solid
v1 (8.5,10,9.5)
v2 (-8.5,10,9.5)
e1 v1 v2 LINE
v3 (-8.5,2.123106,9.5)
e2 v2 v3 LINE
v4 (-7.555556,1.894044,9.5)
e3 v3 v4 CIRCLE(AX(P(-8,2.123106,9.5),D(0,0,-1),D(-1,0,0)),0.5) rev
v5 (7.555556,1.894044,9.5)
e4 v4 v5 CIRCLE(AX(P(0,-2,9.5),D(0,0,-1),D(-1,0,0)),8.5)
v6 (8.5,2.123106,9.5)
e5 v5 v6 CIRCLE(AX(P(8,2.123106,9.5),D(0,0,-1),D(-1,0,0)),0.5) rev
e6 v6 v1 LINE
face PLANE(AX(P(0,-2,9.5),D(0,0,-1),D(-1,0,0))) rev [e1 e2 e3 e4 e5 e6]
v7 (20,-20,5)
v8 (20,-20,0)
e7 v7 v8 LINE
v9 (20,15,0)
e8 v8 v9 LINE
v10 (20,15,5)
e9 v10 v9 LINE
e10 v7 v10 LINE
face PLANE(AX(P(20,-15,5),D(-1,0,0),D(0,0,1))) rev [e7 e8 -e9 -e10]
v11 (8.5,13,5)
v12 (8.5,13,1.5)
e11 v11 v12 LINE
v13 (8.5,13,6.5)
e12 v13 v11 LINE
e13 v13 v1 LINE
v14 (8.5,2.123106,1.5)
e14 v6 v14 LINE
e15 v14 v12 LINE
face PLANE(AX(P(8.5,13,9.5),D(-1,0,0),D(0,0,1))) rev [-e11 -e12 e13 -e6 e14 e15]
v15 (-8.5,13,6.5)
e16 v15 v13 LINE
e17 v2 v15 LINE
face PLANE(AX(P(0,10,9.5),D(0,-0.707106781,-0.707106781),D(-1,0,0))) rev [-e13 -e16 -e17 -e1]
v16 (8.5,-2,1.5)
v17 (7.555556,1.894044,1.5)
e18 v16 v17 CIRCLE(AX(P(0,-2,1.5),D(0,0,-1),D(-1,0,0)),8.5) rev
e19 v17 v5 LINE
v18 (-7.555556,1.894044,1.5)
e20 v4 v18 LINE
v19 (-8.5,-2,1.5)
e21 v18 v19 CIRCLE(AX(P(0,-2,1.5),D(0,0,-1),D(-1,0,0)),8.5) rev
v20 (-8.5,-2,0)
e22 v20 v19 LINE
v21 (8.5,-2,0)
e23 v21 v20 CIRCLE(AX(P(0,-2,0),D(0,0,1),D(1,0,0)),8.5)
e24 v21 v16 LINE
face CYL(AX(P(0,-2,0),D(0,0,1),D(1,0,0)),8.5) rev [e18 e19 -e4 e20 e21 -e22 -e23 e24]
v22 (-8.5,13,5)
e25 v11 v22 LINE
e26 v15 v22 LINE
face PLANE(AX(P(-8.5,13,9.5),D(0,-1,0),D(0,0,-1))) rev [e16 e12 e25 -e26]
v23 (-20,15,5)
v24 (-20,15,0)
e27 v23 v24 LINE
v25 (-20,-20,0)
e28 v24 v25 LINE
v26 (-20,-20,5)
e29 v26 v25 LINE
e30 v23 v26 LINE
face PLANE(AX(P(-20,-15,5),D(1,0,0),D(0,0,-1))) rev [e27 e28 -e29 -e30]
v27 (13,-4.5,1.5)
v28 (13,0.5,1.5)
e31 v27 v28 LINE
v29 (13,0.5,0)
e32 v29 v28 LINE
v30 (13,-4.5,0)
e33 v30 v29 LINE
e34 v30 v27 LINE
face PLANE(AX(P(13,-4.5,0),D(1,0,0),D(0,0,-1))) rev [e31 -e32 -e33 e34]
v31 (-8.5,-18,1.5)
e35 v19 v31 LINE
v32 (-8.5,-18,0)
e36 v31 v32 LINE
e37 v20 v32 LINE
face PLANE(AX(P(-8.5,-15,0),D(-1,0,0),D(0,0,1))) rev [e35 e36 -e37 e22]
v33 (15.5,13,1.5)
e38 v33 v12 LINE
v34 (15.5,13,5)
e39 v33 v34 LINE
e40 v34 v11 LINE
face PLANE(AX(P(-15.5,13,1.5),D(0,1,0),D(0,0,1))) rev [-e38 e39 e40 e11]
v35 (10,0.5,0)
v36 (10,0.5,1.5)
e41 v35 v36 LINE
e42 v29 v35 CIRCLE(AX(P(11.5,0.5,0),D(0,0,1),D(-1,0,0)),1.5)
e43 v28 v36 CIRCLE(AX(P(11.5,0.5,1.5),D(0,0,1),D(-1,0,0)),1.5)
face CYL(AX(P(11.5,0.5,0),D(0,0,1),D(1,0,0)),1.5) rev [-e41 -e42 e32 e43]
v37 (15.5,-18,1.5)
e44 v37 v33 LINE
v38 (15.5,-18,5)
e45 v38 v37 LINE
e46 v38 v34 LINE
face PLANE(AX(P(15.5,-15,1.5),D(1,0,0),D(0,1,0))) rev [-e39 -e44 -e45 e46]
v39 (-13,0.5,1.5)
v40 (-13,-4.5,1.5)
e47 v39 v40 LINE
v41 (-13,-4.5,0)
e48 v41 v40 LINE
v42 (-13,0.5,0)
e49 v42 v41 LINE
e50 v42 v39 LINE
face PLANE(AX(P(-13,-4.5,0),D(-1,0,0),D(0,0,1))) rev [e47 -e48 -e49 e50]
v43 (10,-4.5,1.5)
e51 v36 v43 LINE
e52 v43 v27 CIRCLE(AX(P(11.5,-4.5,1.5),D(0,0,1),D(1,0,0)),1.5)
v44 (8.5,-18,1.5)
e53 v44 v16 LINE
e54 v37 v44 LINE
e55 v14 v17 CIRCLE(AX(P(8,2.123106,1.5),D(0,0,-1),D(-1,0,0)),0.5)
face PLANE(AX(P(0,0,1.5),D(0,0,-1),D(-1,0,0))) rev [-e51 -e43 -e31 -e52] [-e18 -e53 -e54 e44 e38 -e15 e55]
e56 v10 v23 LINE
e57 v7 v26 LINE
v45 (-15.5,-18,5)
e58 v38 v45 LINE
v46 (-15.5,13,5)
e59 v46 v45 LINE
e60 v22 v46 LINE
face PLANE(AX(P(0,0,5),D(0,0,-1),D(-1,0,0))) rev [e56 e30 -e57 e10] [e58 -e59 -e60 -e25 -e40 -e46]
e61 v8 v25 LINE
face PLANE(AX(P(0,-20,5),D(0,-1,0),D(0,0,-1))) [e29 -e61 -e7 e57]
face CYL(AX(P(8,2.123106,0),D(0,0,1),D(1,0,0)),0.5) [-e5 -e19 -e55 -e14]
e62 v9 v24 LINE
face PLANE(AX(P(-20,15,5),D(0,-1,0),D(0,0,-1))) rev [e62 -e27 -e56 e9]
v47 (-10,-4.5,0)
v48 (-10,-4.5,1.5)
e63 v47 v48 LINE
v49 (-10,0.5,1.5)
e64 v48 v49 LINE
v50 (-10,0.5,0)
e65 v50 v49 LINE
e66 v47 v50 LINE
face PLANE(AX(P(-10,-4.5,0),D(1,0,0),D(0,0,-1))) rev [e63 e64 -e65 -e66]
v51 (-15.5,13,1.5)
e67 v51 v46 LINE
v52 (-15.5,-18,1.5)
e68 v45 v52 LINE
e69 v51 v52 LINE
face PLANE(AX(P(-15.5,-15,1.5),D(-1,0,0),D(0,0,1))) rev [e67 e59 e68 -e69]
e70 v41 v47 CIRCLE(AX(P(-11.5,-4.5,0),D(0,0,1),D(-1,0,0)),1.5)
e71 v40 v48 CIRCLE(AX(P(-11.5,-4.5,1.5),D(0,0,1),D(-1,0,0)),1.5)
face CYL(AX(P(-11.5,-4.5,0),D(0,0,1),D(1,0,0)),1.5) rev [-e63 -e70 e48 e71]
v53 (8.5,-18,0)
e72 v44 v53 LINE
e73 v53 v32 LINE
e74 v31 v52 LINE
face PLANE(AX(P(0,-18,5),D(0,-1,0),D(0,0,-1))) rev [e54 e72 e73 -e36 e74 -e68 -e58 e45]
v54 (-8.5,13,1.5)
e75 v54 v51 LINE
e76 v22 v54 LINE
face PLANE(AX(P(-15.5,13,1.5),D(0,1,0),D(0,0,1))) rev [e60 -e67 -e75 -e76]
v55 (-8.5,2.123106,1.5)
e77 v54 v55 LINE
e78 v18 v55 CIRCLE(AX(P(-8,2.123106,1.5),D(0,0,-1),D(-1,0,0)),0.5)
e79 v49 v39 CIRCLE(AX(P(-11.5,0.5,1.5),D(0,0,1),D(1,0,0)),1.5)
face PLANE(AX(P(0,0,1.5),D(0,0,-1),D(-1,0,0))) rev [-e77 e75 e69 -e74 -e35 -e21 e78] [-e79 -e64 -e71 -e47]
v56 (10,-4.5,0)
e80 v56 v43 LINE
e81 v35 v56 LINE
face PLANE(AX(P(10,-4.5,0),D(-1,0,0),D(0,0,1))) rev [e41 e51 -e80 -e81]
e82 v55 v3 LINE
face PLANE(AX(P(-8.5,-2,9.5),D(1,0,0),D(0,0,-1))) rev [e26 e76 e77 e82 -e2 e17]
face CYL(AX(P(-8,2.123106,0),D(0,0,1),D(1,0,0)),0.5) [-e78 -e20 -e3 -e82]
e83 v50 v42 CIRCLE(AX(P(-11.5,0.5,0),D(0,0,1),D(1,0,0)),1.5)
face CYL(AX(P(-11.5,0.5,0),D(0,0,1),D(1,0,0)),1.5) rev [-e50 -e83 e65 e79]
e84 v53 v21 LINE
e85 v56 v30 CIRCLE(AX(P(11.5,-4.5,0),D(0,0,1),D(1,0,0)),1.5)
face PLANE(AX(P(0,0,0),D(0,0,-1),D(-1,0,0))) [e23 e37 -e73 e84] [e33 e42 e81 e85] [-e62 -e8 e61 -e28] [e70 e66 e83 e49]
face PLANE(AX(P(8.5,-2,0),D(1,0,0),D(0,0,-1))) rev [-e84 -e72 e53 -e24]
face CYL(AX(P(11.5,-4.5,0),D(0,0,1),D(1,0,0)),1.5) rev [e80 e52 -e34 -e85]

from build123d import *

# Parameters (mm, degrees)
SKETCH_1_W          = 40
SKETCH_1_H          = 30
EXTRUDE_1_DEPTH     = 5
SKETCH_2_W          = 31
SKETCH_2_H          = 28
CUT_EXTRUDE_1_DEPTH = 3.5
CUT_EXTRUDE_2_DEPTH = 26.243811123
EXTRUDE_START       = 8
EXTRUDE_2_DEPTH     = 8
FILLET_START        = 1.5
FILLET_1_DEPTH      = 8.5
CHAMFER_1_SIZE      = 3
EXTRUDE_3_DEPTH     = 5
SKETCH_7_W          = 7
SKETCH_7_H          = 3
EXTRUDE_4_DEPTH     = 1.5


with BuildPart() as part:
    # ｽｹｯﾁ1 → ﾎﾞｽ - 押し出し1 (new body)
    with BuildSketch(Plane.XY):
        Rectangle(SKETCH_1_W, SKETCH_1_H)
    extrude(amount=EXTRUDE_1_DEPTH)

    # ｽｹｯﾁ2 → ｶｯﾄ - 押し出し1 (cut)
    with BuildSketch(Plane.XY.offset(5)):
        with Locations((0, -1)):
            Rectangle(SKETCH_2_W, SKETCH_2_H)
    extrude(amount=-CUT_EXTRUDE_1_DEPTH, mode=Mode.SUBTRACT)

    # ｽｹｯﾁ3 → ｶｯﾄ - 押し出し2 (cut, through all)
    with BuildSketch(Plane.XY.offset(1.5)):
        with BuildLine():
            Line((8.5, -2), (8.5, -15))
            Line((8.5, -15), (-8.5, -15))
            Line((-8.5, -15), (-8.5, -2))
            ThreePointArc((-8.5, -2), (0, 6.5), (8.5, -2))
        make_face()
        with BuildLine():
            Line((13, -4.5), (13, 0.5))
            ThreePointArc((13, 0.5), (11.5, 2), (10, 0.5))
            Line((10, 0.5), (10, -4.5))
            ThreePointArc((10, -4.5), (11.5, -6), (13, -4.5))
        make_face()
        with BuildLine():
            Line((-13, -4.5), (-13, 0.5))
            ThreePointArc((-13, 0.5), (-11.5, 2), (-10, 0.5))
            Line((-10, 0.5), (-10, -4.5))
            ThreePointArc((-10, -4.5), (-11.5, -6), (-13, -4.5))
        make_face()
    extrude(amount=-CUT_EXTRUDE_2_DEPTH, mode=Mode.SUBTRACT)

    # ｽｹｯﾁ4 → ﾎﾞｽ - 押し出し2 (add)
    with BuildSketch(Plane.XY.offset(1.5).offset(EXTRUDE_START)):
        with BuildLine():
            Line((-8.5, -2), (-8.5, 13))
            Line((-8.5, 13), (8.5, 13))
            Line((8.5, 13), (8.5, -2))
            ThreePointArc((8.5, -2), (0, 6.5), (-8.5, -2))
        make_face()
    extrude(amount=-EXTRUDE_2_DEPTH)

    # ﾌｨﾚｯﾄ1: read off the stored shape, not the designer's step
    # ﾌｨﾚｯﾄ1 outline → ﾌｨﾚｯﾄ1 (cut)
    with BuildSketch(Plane.XY.offset(FILLET_START)):
        with BuildLine():
            ThreePointArc((8.5, 2.123105626), (8.117851131, 1.637192968), (7.555555556, 1.894044202))
            ThreePointArc((7.555555556, 1.894044202), (8.260515184, 0.003469213), (8.5, -2))
            Line((8.5, -2), (8.5, 2.123105626))
        make_face()
        with BuildLine():
            ThreePointArc((-7.555555556, 1.894044202), (-8.117851131, 1.637192968), (-8.5, 2.123105626))
            Line((-8.5, 2.123105626), (-8.5, -2))
            ThreePointArc((-8.5, -2), (-8.260515184, 0.003469213), (-7.555555556, 1.894044202))
        make_face()
    extrude(amount=FILLET_1_DEPTH, mode=Mode.SUBTRACT)

    # 面取り1
    chamfer_1_edges = [part.edges().sort_by_distance(p)[0] for p in [
        (0, 13, 9.5),
    ]]
    chamfer(chamfer_1_edges, length=CHAMFER_1_SIZE)

    # ｽｹｯﾁ5 → ﾎﾞｽ - 押し出し3 (add)
    with BuildSketch(Plane(origin=(0, 0, 0), x_dir=(-1, 0, 0), z_dir=(0, 0, -1))):
        Polygon((-15.5, -15), (-20, -15), (-20, -20), (20, -20), (20, -15), (15.5, -15), (15.5, -18), (8.5, -18), (-8.5, -18), (-15.5, -18), align=None)
    extrude(amount=-EXTRUDE_3_DEPTH)

    # ｽｹｯﾁ7 → ﾎﾞｽ - 押し出し4 (add)
    with BuildSketch(Plane(origin=(0, 0, 0), x_dir=(-1, 0, 0), z_dir=(0, 0, -1))):
        with Locations((12, -16.5)):
            Rectangle(SKETCH_7_W, SKETCH_7_H)
        with Locations((-12, -16.5)):
            Rectangle(SKETCH_7_W, SKETCH_7_H)
    extrude(amount=-EXTRUDE_4_DEPTH)


solid = part.part
